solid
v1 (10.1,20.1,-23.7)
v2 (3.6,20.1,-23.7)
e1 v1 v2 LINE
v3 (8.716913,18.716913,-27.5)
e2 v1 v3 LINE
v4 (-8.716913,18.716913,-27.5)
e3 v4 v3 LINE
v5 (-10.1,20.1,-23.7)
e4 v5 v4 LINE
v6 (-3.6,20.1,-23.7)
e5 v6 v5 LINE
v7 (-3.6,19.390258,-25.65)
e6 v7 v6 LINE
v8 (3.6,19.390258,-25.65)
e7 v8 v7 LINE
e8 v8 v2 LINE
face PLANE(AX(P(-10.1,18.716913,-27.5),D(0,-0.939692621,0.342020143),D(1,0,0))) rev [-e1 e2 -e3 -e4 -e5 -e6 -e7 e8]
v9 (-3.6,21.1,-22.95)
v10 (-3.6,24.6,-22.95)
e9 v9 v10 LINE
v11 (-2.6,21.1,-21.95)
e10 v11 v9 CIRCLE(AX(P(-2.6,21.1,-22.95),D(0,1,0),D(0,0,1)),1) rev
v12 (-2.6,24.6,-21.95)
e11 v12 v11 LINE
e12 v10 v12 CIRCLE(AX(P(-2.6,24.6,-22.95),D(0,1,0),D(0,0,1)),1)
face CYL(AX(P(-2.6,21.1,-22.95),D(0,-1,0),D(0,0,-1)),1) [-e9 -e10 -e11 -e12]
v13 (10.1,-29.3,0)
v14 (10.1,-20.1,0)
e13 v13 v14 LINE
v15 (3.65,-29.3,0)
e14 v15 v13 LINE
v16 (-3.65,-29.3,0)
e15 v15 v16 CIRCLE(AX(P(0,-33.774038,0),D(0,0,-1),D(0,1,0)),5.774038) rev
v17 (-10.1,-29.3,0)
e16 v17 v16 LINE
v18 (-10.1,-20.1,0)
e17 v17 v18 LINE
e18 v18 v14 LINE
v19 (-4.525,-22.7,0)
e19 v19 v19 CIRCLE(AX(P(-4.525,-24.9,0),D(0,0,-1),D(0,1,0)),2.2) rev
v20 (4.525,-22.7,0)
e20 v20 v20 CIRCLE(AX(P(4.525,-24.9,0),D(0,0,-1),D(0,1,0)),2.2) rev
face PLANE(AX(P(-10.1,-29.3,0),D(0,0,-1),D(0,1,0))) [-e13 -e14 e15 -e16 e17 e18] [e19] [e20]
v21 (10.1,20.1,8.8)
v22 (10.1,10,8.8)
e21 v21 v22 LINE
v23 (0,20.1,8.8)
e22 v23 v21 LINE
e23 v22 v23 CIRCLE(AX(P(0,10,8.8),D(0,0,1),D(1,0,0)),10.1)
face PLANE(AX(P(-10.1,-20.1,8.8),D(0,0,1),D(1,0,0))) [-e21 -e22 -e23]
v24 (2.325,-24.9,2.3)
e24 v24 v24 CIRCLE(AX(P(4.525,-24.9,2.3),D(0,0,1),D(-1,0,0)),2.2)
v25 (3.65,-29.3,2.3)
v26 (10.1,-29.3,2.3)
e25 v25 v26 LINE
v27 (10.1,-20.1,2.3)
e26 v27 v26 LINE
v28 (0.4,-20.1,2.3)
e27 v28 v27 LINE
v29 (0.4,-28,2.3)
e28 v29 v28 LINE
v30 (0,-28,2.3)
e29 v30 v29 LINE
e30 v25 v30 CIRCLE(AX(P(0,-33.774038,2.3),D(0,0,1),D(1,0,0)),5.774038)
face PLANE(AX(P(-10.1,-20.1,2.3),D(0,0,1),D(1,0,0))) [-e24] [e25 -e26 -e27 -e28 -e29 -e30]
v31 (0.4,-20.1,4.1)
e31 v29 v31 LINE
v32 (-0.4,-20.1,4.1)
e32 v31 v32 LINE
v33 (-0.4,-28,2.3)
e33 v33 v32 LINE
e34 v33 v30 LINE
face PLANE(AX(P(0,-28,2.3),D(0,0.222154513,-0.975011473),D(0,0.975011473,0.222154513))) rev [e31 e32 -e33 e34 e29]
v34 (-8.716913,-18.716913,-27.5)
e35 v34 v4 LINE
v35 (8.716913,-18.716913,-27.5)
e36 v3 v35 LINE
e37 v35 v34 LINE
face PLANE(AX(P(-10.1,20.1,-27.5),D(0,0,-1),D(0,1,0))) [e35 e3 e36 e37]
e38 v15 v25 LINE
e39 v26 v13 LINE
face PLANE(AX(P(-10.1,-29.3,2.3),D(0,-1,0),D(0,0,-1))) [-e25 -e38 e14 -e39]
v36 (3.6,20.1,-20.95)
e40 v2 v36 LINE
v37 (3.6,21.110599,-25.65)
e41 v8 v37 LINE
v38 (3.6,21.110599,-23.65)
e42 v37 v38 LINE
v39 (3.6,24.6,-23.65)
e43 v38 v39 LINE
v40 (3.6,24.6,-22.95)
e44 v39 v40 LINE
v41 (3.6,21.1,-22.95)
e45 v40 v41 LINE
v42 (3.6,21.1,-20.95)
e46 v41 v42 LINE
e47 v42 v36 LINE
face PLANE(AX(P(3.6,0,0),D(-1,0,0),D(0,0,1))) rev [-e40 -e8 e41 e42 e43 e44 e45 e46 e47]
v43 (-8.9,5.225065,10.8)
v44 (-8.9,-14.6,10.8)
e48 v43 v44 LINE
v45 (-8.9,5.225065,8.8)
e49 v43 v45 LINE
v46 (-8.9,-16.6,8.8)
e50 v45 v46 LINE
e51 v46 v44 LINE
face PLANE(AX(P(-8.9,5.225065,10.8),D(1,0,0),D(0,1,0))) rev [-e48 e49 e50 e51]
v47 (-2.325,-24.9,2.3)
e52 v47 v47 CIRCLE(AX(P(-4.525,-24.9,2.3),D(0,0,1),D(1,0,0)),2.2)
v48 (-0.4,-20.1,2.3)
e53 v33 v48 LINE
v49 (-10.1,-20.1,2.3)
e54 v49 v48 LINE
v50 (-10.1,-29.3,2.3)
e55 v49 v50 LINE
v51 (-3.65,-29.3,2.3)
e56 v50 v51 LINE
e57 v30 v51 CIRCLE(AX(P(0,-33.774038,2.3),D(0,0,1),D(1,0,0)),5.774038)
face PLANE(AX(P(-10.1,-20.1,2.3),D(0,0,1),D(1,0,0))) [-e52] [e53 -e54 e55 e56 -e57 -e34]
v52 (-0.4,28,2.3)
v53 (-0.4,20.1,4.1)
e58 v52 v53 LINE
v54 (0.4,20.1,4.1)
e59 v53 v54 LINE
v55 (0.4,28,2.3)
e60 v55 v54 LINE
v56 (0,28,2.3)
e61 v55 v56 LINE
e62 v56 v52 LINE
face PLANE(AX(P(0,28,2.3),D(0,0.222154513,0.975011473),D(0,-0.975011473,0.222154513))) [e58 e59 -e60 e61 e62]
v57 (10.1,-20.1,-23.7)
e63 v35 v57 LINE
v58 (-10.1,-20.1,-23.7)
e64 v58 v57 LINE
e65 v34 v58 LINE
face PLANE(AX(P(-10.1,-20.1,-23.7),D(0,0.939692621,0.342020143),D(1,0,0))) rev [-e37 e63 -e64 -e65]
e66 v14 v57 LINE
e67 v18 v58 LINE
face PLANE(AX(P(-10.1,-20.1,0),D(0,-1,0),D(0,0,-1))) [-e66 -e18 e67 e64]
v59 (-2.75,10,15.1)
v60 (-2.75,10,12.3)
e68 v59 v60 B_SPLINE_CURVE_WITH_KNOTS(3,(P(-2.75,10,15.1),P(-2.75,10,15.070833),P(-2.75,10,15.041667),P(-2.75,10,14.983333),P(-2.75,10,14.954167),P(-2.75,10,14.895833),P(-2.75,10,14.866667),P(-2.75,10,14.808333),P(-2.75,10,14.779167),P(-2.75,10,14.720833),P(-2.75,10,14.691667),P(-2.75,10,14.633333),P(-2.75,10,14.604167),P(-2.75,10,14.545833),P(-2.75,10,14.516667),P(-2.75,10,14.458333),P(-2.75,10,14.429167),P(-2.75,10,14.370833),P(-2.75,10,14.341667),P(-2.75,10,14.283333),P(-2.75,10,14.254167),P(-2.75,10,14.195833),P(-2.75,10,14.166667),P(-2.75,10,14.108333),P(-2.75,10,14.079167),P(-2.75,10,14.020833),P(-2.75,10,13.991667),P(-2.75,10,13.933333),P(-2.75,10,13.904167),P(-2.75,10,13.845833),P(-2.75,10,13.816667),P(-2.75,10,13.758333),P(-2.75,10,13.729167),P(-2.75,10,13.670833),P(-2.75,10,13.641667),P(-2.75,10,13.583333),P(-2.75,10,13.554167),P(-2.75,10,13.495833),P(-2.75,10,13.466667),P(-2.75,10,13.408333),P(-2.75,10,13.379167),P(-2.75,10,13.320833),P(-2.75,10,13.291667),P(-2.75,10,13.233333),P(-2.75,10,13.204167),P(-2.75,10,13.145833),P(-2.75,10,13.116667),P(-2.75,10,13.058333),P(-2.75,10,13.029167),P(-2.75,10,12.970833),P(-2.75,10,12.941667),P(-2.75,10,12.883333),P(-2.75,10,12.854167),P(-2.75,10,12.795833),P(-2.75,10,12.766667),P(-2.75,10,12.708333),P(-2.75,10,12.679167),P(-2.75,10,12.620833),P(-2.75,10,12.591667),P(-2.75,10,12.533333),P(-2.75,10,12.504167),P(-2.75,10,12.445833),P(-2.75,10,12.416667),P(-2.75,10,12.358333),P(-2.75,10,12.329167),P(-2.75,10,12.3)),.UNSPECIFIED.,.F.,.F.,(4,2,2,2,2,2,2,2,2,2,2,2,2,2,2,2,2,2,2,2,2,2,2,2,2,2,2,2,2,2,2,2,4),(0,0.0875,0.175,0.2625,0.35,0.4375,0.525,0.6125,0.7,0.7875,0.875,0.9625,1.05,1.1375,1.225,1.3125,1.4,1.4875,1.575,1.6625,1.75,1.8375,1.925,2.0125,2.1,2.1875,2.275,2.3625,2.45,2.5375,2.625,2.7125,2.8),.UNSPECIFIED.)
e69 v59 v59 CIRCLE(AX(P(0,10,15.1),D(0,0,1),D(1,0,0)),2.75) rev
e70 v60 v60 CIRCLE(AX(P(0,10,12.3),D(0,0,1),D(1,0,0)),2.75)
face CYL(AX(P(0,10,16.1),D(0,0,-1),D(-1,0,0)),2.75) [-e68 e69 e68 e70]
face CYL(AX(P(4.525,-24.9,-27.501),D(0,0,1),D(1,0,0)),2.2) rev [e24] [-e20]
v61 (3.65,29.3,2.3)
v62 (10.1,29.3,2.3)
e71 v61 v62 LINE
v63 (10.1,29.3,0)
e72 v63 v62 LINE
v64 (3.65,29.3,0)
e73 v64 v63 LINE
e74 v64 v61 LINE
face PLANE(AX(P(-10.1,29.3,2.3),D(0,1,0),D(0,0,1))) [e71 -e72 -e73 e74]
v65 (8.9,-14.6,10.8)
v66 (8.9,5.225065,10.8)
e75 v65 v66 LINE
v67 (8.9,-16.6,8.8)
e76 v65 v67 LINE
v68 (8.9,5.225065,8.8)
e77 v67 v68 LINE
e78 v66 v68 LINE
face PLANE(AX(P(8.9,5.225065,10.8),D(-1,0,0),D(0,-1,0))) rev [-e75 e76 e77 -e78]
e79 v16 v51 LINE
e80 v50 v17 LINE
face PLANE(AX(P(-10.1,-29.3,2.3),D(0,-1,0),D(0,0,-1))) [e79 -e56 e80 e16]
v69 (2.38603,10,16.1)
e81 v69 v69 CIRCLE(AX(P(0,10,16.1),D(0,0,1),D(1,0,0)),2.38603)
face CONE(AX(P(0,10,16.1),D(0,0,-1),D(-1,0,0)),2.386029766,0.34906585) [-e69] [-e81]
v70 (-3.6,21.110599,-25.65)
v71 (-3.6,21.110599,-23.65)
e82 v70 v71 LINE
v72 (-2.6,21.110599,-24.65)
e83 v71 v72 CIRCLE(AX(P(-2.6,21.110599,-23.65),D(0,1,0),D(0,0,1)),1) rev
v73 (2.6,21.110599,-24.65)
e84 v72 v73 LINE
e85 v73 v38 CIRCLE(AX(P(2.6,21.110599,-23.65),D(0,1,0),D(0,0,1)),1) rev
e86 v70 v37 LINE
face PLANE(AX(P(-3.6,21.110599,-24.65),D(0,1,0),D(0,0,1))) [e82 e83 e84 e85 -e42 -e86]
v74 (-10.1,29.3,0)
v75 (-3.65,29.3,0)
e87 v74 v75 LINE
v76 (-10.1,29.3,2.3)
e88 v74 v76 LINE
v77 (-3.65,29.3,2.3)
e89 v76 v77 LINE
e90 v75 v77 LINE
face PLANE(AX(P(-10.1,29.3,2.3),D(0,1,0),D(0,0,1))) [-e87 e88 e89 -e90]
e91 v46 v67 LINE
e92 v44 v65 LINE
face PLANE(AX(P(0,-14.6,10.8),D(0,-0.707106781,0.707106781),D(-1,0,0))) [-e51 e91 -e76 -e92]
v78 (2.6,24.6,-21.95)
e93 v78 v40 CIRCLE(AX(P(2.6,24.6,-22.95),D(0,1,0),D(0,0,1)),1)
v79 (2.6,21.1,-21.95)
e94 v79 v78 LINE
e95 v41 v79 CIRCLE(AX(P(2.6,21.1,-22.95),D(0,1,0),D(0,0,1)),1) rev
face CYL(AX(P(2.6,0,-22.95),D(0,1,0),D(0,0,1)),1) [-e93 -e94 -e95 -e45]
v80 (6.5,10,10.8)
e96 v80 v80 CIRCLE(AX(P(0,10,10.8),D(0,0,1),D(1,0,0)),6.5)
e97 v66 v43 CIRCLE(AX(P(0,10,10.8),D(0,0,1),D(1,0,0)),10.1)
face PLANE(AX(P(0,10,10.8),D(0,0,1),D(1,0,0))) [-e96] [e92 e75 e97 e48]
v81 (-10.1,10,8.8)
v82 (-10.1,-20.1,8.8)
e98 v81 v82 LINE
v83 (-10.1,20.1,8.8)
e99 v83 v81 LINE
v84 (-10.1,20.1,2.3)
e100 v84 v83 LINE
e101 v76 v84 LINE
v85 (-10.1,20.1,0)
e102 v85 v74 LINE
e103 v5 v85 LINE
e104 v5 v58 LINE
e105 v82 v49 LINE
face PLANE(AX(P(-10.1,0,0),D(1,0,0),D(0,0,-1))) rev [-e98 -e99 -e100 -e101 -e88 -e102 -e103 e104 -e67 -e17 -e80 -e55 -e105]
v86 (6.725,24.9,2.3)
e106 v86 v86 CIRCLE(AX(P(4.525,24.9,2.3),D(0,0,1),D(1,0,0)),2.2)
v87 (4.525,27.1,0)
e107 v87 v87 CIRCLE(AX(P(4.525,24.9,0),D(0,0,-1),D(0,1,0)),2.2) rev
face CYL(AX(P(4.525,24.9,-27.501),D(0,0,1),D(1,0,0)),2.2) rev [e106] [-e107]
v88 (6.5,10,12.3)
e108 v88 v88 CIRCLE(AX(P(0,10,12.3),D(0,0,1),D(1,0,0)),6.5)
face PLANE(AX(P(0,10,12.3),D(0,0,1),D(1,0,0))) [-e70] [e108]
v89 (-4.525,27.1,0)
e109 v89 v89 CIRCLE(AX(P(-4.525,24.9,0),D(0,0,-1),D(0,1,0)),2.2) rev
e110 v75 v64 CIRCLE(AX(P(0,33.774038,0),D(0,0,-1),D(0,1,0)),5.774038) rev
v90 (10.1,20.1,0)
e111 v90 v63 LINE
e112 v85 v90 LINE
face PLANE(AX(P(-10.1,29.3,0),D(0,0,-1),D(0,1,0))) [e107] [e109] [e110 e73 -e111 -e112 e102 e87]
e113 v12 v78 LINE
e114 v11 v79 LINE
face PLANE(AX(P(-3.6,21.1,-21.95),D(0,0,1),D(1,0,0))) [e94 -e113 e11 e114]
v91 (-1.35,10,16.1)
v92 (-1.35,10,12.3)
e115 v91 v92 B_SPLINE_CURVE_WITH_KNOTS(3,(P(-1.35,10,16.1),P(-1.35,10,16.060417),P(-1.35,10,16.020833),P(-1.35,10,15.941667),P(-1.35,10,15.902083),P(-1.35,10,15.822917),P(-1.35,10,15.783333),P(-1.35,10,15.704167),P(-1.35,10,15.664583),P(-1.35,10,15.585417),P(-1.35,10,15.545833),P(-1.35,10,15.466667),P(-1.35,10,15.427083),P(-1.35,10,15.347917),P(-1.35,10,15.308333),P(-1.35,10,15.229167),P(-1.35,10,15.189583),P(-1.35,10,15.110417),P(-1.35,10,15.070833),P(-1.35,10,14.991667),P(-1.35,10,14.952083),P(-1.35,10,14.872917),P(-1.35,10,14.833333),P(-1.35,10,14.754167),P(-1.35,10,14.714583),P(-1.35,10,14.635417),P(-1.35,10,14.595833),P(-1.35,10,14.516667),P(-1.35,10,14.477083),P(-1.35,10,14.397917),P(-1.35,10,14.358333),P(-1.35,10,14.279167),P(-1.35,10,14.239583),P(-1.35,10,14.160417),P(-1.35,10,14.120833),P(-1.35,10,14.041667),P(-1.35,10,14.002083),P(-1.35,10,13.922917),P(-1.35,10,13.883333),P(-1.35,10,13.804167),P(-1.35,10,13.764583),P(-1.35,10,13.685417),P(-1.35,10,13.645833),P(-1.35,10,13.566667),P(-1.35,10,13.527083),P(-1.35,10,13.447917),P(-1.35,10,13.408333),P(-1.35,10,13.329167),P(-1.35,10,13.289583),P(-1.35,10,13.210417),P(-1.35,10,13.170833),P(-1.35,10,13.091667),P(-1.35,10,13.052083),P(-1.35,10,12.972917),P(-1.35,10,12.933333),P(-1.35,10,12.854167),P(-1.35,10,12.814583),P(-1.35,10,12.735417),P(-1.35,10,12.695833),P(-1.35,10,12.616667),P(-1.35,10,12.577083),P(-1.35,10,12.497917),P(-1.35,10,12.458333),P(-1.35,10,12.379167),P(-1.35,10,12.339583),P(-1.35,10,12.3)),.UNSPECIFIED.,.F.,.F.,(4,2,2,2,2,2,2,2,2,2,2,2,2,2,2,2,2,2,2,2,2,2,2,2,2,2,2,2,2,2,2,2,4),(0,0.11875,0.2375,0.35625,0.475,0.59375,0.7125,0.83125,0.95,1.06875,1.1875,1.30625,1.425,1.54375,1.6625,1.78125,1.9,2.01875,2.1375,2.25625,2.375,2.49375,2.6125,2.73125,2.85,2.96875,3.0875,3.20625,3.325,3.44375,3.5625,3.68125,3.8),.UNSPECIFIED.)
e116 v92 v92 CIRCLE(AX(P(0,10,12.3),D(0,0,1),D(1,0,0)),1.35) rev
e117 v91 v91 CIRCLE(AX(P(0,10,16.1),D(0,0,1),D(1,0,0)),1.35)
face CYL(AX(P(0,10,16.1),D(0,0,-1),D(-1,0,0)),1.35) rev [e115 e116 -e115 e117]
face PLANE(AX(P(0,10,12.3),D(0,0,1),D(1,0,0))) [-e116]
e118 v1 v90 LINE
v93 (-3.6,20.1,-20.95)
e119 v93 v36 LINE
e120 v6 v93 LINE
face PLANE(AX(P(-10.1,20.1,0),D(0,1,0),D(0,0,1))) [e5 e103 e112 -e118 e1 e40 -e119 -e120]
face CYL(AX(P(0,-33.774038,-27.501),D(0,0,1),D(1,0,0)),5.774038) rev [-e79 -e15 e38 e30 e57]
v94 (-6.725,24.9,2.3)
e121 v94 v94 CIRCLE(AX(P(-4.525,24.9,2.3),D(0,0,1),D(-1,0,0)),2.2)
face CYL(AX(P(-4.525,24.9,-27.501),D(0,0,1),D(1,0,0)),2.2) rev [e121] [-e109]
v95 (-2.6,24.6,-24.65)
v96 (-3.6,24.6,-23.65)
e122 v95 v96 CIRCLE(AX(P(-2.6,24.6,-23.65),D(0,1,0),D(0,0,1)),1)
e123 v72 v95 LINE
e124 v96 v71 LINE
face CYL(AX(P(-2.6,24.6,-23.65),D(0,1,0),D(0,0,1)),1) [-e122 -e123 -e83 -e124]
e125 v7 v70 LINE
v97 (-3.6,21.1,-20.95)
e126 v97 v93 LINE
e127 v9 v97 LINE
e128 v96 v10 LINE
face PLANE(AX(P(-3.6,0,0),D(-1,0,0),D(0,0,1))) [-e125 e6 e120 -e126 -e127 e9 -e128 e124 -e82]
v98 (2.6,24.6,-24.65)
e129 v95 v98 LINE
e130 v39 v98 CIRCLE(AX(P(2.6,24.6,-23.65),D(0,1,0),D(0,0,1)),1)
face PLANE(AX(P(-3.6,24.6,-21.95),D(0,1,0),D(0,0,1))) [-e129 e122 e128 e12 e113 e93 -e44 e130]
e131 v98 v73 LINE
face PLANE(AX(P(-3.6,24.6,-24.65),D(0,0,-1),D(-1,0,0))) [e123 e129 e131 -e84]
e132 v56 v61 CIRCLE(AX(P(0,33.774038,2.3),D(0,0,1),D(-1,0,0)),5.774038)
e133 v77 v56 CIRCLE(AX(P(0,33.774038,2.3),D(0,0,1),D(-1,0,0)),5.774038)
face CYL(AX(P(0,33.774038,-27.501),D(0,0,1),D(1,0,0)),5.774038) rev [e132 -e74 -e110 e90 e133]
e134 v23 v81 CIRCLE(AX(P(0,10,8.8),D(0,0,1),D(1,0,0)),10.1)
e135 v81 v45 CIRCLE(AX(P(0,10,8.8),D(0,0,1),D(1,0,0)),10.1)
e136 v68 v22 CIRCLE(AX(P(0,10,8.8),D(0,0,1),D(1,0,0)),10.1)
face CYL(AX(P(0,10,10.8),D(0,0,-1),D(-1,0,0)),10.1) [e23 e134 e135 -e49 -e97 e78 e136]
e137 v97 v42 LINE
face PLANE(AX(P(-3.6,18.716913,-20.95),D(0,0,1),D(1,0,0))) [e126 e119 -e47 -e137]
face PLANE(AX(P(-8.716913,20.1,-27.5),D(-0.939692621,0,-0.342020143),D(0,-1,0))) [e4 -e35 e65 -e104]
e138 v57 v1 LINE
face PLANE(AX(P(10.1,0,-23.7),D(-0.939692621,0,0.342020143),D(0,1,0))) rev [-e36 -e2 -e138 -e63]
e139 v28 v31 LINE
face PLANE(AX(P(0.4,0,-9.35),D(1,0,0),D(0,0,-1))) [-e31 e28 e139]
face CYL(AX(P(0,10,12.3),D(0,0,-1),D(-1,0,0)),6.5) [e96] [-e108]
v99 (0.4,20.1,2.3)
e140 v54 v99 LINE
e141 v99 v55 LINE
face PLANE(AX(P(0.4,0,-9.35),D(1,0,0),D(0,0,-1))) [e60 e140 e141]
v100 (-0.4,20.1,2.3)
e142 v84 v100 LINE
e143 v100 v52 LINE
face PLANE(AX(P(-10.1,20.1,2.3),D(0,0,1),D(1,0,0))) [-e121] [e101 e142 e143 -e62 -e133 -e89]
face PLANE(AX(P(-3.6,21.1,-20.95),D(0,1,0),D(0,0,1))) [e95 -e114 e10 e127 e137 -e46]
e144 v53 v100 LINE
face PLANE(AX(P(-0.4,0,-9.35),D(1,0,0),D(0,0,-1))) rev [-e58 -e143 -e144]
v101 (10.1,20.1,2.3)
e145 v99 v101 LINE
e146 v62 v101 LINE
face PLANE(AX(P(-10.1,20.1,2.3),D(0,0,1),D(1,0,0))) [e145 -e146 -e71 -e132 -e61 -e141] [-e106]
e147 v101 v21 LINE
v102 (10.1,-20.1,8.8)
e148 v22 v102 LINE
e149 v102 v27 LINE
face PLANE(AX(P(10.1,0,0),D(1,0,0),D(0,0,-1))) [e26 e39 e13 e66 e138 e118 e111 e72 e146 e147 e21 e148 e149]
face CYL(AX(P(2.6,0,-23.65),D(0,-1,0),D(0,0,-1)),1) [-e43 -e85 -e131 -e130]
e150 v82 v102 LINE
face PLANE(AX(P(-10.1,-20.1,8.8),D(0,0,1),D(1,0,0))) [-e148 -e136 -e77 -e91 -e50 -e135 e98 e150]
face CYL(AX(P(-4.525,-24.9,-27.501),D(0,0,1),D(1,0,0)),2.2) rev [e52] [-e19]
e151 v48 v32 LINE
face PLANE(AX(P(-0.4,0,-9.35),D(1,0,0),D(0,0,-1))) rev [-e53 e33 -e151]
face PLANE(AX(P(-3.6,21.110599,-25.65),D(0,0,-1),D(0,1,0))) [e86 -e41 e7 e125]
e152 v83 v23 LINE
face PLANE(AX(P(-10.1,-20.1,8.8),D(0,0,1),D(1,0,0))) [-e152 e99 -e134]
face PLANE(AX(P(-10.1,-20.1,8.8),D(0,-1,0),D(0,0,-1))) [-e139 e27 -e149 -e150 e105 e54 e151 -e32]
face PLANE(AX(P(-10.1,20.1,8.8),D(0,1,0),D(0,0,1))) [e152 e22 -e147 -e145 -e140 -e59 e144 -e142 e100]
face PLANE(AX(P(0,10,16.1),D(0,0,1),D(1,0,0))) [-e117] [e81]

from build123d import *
from OCP.BRepFilletAPI import BRepFilletAPI_MakeChamfer

# Parameters (mm, degrees)
BOSS_EXTRUDE1_DEPTH      = 10.1
BOSS_EXTRUDE1_DEPTH_BACK = 10.1
CUT_EXTRUDE1_REACH       = 44.995
SKETCH2_R                = 2.2
RIB3_REACH               = 43.434
SKETCH3_WALL_W           = 92.969832662
SKETCH3_WALL_H           = 0.8
BOSS_EXTRUDE2_DEPTH      = 2
CHAMFER1_SIZE            = 2
SKETCH5_R                = 6.5
BOSS_EXTRUDE3_DEPTH      = 1.5
CHAMFER2_SIZE            = 3.8
CHAMFER2_SIZE2           = 1.38308689
BOSS_EXTRUDE4_DEPTH      = 3.6
BOSS_EXTRUDE4_DEPTH_BACK = 3.6
FILLET2_R                = 1
SKETCH7_R                = 2.75
SKETCH7_R_2              = 1.35
BOSS_EXTRUDE5_DEPTH      = 3.8
CHAMFER3_SIZE            = 1
CHAMFER3_SIZE2           = 0.363970234


with BuildPart() as part:
    # Sketch1 → Boss-Extrude1 (new, two sides: drawn at the far end of the back side and taken through both)
    with BuildSketch(Plane(origin=(0, 0, 0), x_dir=(0, 0, -1), z_dir=(1, 0, 0)).offset(-BOSS_EXTRUDE1_DEPTH_BACK)):
        Polygon((-8.8, -20.1), (-8.8, 20.1), (-2.3, 20.1), (-2.3, 29.3), (0, 29.3), (0, 20.1), (27.5, 20.1), (27.5, -20.1), (0, -20.1), (0, -29.3), (-2.3, -29.3), (-2.3, -20.1), align=None)
    extrude(amount=BOSS_EXTRUDE1_DEPTH + BOSS_EXTRUDE1_DEPTH_BACK)

    # Sketch2 → Cut-Extrude1 (cut, up to next)
    with BuildSketch(Plane.XY.offset(2.3), mode=Mode.PRIVATE) as cut_extrude1_sk1:
        with Locations((4.525, 24.9)):
            Circle(SKETCH2_R)
    cut_extrude1_tool1 = extrude(cut_extrude1_sk1.sketch, amount=-CUT_EXTRUDE1_REACH, mode=Mode.PRIVATE) & part.part
    # Sketch2 → Cut-Extrude1 (cut, up to next)
    with BuildSketch(Plane.XY.offset(2.3), mode=Mode.PRIVATE) as cut_extrude1_sk2:
        with Locations(Location((-4.525, 24.9, 0), (0, 0, 90))):
            Circle(SKETCH2_R)
    cut_extrude1_tool2 = extrude(cut_extrude1_sk2.sketch, amount=-CUT_EXTRUDE1_REACH, mode=Mode.PRIVATE) & part.part
    # Sketch2 → Cut-Extrude1 (cut, up to next)
    with BuildSketch(Plane.XY.offset(2.3), mode=Mode.PRIVATE) as cut_extrude1_sk3:
        with Locations((-4.525, -24.9)):
            Circle(SKETCH2_R)
    cut_extrude1_tool3 = extrude(cut_extrude1_sk3.sketch, amount=-CUT_EXTRUDE1_REACH, mode=Mode.PRIVATE) & part.part
    # Sketch2 → Cut-Extrude1 (cut, up to next)
    with BuildSketch(Plane.XY.offset(2.3), mode=Mode.PRIVATE) as cut_extrude1_sk4:
        with Locations(Location((4.525, -24.9, 0), (0, 0, 90))):
            Circle(SKETCH2_R)
    cut_extrude1_tool4 = extrude(cut_extrude1_sk4.sketch, amount=-CUT_EXTRUDE1_REACH, mode=Mode.PRIVATE) & part.part
    # Sketch2 → Cut-Extrude1 (cut, up to next)
    with BuildSketch(Plane.XY.offset(2.3), mode=Mode.PRIVATE) as cut_extrude1_sk5:
        with BuildLine():
            Line((-3.65, 29.3), (3.65, 29.3))
            ThreePointArc((3.65, 29.3), (0, 28), (-3.65, 29.3))
        make_face()
    cut_extrude1_tool5 = extrude(cut_extrude1_sk5.sketch, amount=-CUT_EXTRUDE1_REACH, mode=Mode.PRIVATE) & part.part
    # Sketch2 → Cut-Extrude1 (cut, up to next)
    with BuildSketch(Plane.XY.offset(2.3), mode=Mode.PRIVATE) as cut_extrude1_sk6:
        with BuildLine():
            Line((-3.65, -29.3), (3.65, -29.3))
            ThreePointArc((3.65, -29.3), (0, -28), (-3.65, -29.3))
        make_face()
    cut_extrude1_tool6 = extrude(cut_extrude1_sk6.sketch, amount=-CUT_EXTRUDE1_REACH, mode=Mode.PRIVATE) & part.part
    add(cut_extrude1_tool1.solids().sort_by_distance((4.525, 24.9, 2.3))[0], mode=Mode.SUBTRACT)
    add(cut_extrude1_tool2.solids().sort_by_distance((-4.525, 24.9, 2.3))[0], mode=Mode.SUBTRACT)
    add(cut_extrude1_tool3.solids().sort_by_distance((-4.525, -24.9, 2.3))[0], mode=Mode.SUBTRACT)
    add(cut_extrude1_tool4.solids().sort_by_distance((4.525, -24.9, 2.3))[0], mode=Mode.SUBTRACT)
    add(cut_extrude1_tool5.solids().sort_by_distance((0, 28.774631, 2.3))[0], mode=Mode.SUBTRACT)
    add(cut_extrude1_tool6.solids().sort_by_distance((0, -28.774631, 2.3))[0], mode=Mode.SUBTRACT)

    # Sketch3 wall → Rib3 (add, up to next)
    with BuildSketch(Plane(origin=(0, 24.05, 3.2), x_dir=(0, -0.975011472973, 0.222154512829), z_dir=(0, -0.222154512829, -0.975011472973)), mode=Mode.PRIVATE) as rib3_sk1:
        Rectangle(SKETCH3_WALL_W, SKETCH3_WALL_H)
    rib3_tool1 = extrude(rib3_sk1.sketch, amount=RIB3_REACH, mode=Mode.PRIVATE) - part.part
    rib3 = rib3_tool1.solids().sort_by_distance((0, 24.05, 3.2))[0]
    add(rib3)

    # Mirror1: Rib3 across plane
    add(rib3.mirror(Plane.ZX))

    # Sketch4 → Boss-Extrude2 (add)
    with BuildSketch(Plane.XY.offset(8.8)):
        with BuildLine():
            Line((8.9, 5.225065445), (8.9, -16.6))
            Line((8.9, -16.6), (-8.9, -16.6))
            Line((-8.9, -16.6), (-8.9, 5.225065445))
            ThreePointArc((-8.9, 5.225065445), (0, 20.1), (8.9, 5.225065445))
        make_face()
    extrude(amount=BOSS_EXTRUDE2_DEPTH)

    # Chamfer1
    chamfer1_edges = [part.edges().sort_by_distance(p)[0] for p in [
        (0, -16.6, 10.8),
    ]]
    chamfer(chamfer1_edges, length=CHAMFER1_SIZE - 0.0001)  # a hair under: the kernel refuses the full size

    # Sketch5 → Boss-Extrude3 (add)
    with BuildSketch(Plane.XY.offset(10.8)):
        with Locations((0, 10)):
            Circle(SKETCH5_R)
    extrude(amount=BOSS_EXTRUDE3_DEPTH)

    # Chamfer2: one chamfer whose edges measure the first distance from different faces: ONE call of the kernel's chamfer builder (chamfer() names one face for all edges)
    chamfer2_edges_1 = [part.edges().sort_by_distance(p)[0] for p in [
        (-10.1, 0, -27.5),
    ]]
    chamfer2_side_1 = [part.faces().sort_by_distance(p)[0] for p in [
        (-10.1, 0, -9.054071711),
    ]]
    chamfer2_edges_2 = [part.edges().sort_by_distance(p)[0] for p in [
        (0, 20.1, -27.5),
    ]]
    chamfer2_side_2 = [part.faces().sort_by_distance(p)[0] for p in [
        (0, 20.1, -13.75),
    ]]
    chamfer2_edges_3 = [part.edges().sort_by_distance(p)[0] for p in [
        (0, -20.1, -27.5),
    ]]
    chamfer2_side_3 = [part.faces().sort_by_distance(p)[0] for p in [
        (0, -20.1, -13.75),
    ]]
    chamfer2_edges_4 = [part.edges().sort_by_distance(p)[0] for p in [
        (10.1, 0, -27.5),
    ]]
    chamfer2_side_4 = [part.faces().sort_by_distance(p)[0] for p in [
        (10.1, 0, -9.054071711),
    ]]
    chamfer2 = BRepFilletAPI_MakeChamfer(part.part.solid().wrapped)
    for e in chamfer2_edges_1:
        chamfer2.Add(CHAMFER2_SIZE, CHAMFER2_SIZE2, e.wrapped, chamfer2_side_1[0].wrapped)  # the first distance lies on this face
    for e in chamfer2_edges_2:
        chamfer2.Add(CHAMFER2_SIZE, CHAMFER2_SIZE2, e.wrapped, chamfer2_side_2[0].wrapped)  # the first distance lies on this face
    for e in chamfer2_edges_3:
        chamfer2.Add(CHAMFER2_SIZE, CHAMFER2_SIZE2, e.wrapped, chamfer2_side_3[0].wrapped)  # the first distance lies on this face
    for e in chamfer2_edges_4:
        chamfer2.Add(CHAMFER2_SIZE, CHAMFER2_SIZE2, e.wrapped, chamfer2_side_4[0].wrapped)  # the first distance lies on this face
    add(Compound.cast(chamfer2.Shape()), mode=Mode.REPLACE)

    # Sketch6 → Boss-Extrude4 (add, two sides: drawn at the far end of the back side and taken through both)
    with BuildSketch(Plane(origin=(0, 0, 0), x_dir=(0, 0, -1), z_dir=(1, 0, 0)).offset(-BOSS_EXTRUDE4_DEPTH_BACK)):
        Polygon((25.65, 18.71691311), (20.95, 18.71691311), (20.95, 21.1), (21.95, 21.1), (21.95, 24.6), (24.65, 24.6), (24.65, 21.110599186), (25.65, 21.110599186), align=None)
    extrude(amount=BOSS_EXTRUDE4_DEPTH + BOSS_EXTRUDE4_DEPTH_BACK)

    # Fillet2
    fillet2_edges = [part.edges().sort_by_distance(p)[0] for p in [
        (-3.6, 22.85, -21.95),
        (-3.6, 22.855299593, -24.65),
        (3.6, 22.855299593, -24.65),
        (3.6, 22.85, -21.95),
    ]]
    fillet(fillet2_edges, radius=FILLET2_R)

    # Sketch7 → Boss-Extrude5 (add)
    with BuildSketch(Plane.XY.offset(12.3)):
        with Locations(Location((0, 10, 0), (0, 0, 180))):
            Circle(SKETCH7_R)
        with Locations(Location((0, 10, 0), (0, 0, 180))):
            Circle(SKETCH7_R_2, mode=Mode.SUBTRACT)
    extrude(amount=BOSS_EXTRUDE5_DEPTH)

    # Chamfer3
    chamfer3_edges = [part.edges().sort_by_distance(p)[0] for p in [
        (2.75, 10, 16.1),
    ]]
    chamfer3_side = [part.faces().sort_by_distance(p)[0] for p in [
        (2.75, 10, 14.2),
    ]]
    chamfer(chamfer3_edges, length=CHAMFER3_SIZE, length2=CHAMFER3_SIZE2, reference=chamfer3_side[0])


solid = part.part
